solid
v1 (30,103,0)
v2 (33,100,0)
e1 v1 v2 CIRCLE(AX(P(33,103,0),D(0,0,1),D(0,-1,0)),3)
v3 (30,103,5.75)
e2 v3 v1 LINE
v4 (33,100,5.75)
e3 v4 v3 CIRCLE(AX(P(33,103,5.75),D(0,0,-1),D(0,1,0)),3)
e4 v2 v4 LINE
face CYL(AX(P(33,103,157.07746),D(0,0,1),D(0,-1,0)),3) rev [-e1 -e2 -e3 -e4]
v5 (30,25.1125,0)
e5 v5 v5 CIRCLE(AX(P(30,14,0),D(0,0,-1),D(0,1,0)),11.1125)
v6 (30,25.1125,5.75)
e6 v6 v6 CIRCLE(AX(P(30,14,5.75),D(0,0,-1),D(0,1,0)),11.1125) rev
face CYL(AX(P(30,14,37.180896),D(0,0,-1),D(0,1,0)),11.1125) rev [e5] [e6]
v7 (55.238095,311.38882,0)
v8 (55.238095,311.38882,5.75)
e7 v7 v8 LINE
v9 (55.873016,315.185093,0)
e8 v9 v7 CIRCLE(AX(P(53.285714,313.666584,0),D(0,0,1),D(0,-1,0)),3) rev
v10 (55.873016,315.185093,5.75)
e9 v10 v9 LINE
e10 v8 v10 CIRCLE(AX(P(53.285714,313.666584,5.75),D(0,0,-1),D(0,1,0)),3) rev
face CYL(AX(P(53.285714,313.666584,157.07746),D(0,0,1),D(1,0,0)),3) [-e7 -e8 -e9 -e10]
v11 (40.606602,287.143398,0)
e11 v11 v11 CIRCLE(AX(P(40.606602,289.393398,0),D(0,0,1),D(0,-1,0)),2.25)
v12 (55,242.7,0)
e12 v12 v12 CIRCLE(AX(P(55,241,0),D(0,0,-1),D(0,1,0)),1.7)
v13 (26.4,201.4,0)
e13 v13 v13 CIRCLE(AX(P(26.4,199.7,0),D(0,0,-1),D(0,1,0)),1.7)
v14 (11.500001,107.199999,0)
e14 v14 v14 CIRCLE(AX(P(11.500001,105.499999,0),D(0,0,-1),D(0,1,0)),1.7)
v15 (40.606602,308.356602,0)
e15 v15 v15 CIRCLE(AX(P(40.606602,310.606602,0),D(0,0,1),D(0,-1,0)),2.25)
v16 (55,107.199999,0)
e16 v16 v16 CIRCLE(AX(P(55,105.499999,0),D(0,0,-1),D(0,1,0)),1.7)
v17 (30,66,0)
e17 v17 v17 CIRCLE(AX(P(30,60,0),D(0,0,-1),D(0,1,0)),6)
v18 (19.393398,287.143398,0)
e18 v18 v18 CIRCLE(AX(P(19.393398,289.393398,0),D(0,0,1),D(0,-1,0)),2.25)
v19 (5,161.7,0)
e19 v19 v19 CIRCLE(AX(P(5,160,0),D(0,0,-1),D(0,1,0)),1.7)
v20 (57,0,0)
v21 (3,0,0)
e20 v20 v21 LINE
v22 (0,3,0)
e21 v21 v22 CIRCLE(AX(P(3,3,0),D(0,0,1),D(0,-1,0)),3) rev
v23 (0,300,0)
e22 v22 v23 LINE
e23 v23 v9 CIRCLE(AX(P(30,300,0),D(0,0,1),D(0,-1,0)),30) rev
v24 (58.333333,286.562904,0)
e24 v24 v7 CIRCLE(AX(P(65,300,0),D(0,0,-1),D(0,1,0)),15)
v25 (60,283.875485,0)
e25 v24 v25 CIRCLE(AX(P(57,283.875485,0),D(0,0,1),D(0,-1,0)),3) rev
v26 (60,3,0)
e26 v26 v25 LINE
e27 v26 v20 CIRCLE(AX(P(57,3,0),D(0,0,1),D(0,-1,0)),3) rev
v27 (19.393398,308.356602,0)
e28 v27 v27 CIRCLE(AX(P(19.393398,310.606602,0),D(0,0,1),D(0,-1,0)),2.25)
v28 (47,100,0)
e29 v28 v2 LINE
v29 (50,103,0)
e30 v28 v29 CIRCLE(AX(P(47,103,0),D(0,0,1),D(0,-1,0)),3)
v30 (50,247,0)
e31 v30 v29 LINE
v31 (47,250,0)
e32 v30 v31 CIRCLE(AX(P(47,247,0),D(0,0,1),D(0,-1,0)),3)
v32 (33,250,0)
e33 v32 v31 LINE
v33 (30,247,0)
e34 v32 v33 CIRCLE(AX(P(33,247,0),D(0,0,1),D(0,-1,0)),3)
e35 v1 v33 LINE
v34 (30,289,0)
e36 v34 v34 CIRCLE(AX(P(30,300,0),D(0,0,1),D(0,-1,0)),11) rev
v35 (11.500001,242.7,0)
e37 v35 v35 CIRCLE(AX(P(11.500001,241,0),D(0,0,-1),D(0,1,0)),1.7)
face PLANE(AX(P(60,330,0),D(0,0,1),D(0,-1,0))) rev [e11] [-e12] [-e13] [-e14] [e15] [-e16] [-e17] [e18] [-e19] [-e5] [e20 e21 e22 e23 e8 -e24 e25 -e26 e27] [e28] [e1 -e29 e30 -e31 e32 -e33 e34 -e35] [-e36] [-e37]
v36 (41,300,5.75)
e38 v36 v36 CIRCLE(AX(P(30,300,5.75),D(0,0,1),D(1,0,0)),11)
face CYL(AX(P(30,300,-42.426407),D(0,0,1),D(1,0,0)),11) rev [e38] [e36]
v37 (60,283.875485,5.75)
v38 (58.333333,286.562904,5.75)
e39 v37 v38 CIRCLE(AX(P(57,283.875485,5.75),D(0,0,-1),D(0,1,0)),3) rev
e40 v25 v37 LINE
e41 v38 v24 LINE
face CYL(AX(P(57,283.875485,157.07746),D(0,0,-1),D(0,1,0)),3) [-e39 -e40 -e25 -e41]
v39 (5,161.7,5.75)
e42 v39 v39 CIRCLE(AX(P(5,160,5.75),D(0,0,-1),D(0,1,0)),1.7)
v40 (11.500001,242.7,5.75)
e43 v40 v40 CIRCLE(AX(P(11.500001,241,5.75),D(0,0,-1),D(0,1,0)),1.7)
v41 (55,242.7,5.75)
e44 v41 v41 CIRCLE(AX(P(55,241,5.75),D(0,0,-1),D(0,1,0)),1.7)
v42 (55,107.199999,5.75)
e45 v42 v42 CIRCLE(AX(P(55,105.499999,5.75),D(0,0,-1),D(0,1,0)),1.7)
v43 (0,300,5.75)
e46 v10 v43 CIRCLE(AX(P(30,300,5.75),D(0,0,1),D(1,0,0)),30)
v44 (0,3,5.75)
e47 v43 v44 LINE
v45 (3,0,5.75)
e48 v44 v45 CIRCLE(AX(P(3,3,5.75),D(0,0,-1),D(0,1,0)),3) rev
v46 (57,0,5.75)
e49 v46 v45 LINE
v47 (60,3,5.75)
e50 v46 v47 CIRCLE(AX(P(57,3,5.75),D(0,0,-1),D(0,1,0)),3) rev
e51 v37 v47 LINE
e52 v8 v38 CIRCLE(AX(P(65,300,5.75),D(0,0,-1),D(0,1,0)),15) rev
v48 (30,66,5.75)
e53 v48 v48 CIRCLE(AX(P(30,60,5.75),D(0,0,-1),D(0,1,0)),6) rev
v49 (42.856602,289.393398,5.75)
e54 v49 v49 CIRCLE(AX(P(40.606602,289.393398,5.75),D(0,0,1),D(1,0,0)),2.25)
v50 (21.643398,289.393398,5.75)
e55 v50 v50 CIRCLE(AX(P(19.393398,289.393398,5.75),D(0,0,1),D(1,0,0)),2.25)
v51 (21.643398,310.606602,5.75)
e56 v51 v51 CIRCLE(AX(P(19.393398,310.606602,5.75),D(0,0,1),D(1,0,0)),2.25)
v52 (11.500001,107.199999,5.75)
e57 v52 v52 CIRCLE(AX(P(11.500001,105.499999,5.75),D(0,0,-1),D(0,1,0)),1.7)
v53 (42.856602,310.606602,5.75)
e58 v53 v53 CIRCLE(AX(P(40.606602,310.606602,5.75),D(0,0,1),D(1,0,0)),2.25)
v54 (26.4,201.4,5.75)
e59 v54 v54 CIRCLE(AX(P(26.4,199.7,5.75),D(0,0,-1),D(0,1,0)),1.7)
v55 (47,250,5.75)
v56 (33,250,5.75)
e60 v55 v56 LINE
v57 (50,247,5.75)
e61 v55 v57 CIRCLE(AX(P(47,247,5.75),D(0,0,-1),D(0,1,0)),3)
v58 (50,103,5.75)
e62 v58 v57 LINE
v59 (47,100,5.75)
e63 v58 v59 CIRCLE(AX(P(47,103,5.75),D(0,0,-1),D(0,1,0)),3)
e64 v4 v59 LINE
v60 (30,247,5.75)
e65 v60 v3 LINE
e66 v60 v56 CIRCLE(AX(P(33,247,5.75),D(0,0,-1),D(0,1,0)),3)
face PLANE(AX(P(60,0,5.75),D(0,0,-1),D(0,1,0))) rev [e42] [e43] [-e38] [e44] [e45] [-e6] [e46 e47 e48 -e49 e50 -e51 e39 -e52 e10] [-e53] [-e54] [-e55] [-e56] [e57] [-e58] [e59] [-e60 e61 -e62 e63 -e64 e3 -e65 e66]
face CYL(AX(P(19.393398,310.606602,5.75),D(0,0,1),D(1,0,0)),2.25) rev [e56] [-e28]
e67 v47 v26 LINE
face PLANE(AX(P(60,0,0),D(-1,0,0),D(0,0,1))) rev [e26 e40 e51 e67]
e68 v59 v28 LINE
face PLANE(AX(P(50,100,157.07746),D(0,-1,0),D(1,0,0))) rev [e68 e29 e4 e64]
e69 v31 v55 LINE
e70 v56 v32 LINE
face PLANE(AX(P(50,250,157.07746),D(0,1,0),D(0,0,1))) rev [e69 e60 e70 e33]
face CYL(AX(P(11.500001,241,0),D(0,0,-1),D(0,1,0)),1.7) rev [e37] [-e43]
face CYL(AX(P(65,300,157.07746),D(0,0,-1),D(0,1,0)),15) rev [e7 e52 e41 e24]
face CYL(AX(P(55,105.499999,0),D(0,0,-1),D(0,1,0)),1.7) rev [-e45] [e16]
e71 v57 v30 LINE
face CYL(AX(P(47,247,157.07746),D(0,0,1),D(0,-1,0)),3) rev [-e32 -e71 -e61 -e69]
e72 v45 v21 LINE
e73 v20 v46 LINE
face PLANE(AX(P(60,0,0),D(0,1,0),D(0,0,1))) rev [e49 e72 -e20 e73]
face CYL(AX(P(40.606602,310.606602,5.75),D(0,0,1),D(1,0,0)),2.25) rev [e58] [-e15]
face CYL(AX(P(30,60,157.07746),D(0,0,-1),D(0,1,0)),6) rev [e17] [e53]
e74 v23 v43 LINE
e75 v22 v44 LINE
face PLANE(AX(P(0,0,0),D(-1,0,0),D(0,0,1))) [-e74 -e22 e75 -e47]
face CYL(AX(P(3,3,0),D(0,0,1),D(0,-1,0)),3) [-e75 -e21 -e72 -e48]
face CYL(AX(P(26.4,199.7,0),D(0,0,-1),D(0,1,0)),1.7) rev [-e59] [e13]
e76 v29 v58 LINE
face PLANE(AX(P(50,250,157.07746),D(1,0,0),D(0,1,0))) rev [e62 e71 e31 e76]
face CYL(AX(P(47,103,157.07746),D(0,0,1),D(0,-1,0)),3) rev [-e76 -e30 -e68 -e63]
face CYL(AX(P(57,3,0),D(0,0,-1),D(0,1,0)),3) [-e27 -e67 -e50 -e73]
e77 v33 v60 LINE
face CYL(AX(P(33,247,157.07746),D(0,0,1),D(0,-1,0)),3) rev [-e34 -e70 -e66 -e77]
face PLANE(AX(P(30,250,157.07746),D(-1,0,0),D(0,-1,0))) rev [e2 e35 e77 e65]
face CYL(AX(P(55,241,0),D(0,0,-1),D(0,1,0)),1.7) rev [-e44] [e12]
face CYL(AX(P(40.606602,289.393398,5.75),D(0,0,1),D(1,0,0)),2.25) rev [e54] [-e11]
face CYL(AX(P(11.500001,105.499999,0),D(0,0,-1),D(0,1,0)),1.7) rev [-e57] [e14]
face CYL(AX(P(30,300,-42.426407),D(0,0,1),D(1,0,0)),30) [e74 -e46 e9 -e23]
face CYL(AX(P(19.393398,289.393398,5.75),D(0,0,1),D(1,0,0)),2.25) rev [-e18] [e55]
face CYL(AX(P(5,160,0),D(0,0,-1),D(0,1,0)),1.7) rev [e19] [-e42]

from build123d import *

# Parameters (mm, degrees)
SKETCH1_W              = 5.75
SKETCH1_H              = 330
BOSS_EXTRUDE1_DEPTH    = 60
CUT_EXTRUDE1_START     = -5.75
CUT_EXTRUDE1_OUTLINE_R = 11
CUT_EXTRUDE1_DEPTH     = 5.75
M4_CLEARANCE_HOLE1_D   = 4.5
SKETCH10_R             = 11.1125
CUT_EXTRUDE4_DEPTH     = 5.75
SKETCH13_R             = 6
SKETCH13_W             = 20
SKETCH13_H             = 150
CUT_EXTRUDE5_DEPTH     = 5.75
FILLET2_R              = 3
M3_CLEARANCE_HOLE1_D   = 3.4


# Read off the part's stored shape, not the designer's step: Cut-Extrude1
with BuildPart() as part:
    # Sketch1 → Boss-Extrude1 (new body)
    with BuildSketch(Plane(origin=(0, 0, 0), x_dir=(0, 0, -1), z_dir=(1, 0, 0))):
        with Locations((-2.875, 165)):
            Rectangle(SKETCH1_W, SKETCH1_H)
    extrude(amount=BOSS_EXTRUDE1_DEPTH)

    # Cut-Extrude1 outline → Cut-Extrude1 (cut)
    with BuildSketch(Plane.XY.offset(5.75).offset(CUT_EXTRUDE1_START)):
        with BuildLine():
            ThreePointArc((0, 300), (8.786796564, 321.213203436), (30, 330))
            Line((30, 330), (0, 330))
            Line((0, 330), (0, 300))
        make_face()
        with BuildLine():
            ThreePointArc((30, 330), (51.213203436, 321.213203436), (60, 300))
            Line((60, 300), (60, 330))
            Line((60, 330), (30, 330))
        make_face()
        with Locations((30, 300)):
            Circle(CUT_EXTRUDE1_OUTLINE_R)
    extrude(amount=CUT_EXTRUDE1_DEPTH, mode=Mode.SUBTRACT)

    # M4 Clearance Hole1 (through all)
    with Locations(Plane.XY.offset(5.75)):
        with Locations((19.393398282, 310.606601718), (40.606601718, 310.606601718), (40.606601718, 289.393398282), (19.393398282, 289.393398282)):
            Hole(M4_CLEARANCE_HOLE1_D / 2)

    # Sketch10 → Cut-Extrude4 (cut)
    with BuildSketch(Plane(origin=(0, 0, 0), x_dir=(-1, 0, 0), z_dir=(0, 0, -1))):
        with Locations(Location((-30, 14, 0), (0, 0, 90))):
            Circle(SKETCH10_R)
    extrude(amount=-CUT_EXTRUDE4_DEPTH, mode=Mode.SUBTRACT)

    # Sketch13 → Cut-Extrude5 (cut)
    with BuildSketch(Plane(origin=(0, 0, 0), x_dir=(-1, 0, 0), z_dir=(0, 0, -1))):
        with Locations(Location((-30, 60, 0), (0, 0, 90))):
            Circle(SKETCH13_R)
        with Locations((-40, 175)):
            Rectangle(SKETCH13_W, SKETCH13_H)
        with BuildLine():
            Line((-60, 285.857864376), (-60, 300))
            ThreePointArc((-60, 300), (-59.277002188, 306.546536707), (-57.142857143, 312.7775313))
            ThreePointArc((-57.142857143, 312.7775313), (-50.08377905, 298.416853586), (-60, 285.857864376))
        make_face()
    extrude(amount=-CUT_EXTRUDE5_DEPTH, mode=Mode.SUBTRACT)

    # Fillet2
    fillet2_edges = [part.edges().sort_by_distance(p)[0] for p in [
        (60, 0, 2.875),
        (0, 0, 2.875),
        (57.142857143, 312.7775313, 2.875),
        (60, 285.857864376, 2.875),
        (50, 100, 2.875),
        (50, 250, 2.875),
        (30, 250, 2.875),
        (30, 100, 2.875),
    ]]
    fillet(fillet2_edges, radius=FILLET2_R)

    # M3 Clearance Hole1 (through all)
    with Locations(Plane(origin=(0, 0, 0), x_dir=(-1, 0, 0), z_dir=(0, 0, -1))):
        with Locations((-11.50000102, 240.99999992), (-55.00000038, 240.99999992), (-11.50000102, 105.49999914), (-55.00000038, 105.49999914), (-5, 160), (-26.4, 199.7)):
            Hole(M3_CLEARANCE_HOLE1_D / 2)


solid = part.part
